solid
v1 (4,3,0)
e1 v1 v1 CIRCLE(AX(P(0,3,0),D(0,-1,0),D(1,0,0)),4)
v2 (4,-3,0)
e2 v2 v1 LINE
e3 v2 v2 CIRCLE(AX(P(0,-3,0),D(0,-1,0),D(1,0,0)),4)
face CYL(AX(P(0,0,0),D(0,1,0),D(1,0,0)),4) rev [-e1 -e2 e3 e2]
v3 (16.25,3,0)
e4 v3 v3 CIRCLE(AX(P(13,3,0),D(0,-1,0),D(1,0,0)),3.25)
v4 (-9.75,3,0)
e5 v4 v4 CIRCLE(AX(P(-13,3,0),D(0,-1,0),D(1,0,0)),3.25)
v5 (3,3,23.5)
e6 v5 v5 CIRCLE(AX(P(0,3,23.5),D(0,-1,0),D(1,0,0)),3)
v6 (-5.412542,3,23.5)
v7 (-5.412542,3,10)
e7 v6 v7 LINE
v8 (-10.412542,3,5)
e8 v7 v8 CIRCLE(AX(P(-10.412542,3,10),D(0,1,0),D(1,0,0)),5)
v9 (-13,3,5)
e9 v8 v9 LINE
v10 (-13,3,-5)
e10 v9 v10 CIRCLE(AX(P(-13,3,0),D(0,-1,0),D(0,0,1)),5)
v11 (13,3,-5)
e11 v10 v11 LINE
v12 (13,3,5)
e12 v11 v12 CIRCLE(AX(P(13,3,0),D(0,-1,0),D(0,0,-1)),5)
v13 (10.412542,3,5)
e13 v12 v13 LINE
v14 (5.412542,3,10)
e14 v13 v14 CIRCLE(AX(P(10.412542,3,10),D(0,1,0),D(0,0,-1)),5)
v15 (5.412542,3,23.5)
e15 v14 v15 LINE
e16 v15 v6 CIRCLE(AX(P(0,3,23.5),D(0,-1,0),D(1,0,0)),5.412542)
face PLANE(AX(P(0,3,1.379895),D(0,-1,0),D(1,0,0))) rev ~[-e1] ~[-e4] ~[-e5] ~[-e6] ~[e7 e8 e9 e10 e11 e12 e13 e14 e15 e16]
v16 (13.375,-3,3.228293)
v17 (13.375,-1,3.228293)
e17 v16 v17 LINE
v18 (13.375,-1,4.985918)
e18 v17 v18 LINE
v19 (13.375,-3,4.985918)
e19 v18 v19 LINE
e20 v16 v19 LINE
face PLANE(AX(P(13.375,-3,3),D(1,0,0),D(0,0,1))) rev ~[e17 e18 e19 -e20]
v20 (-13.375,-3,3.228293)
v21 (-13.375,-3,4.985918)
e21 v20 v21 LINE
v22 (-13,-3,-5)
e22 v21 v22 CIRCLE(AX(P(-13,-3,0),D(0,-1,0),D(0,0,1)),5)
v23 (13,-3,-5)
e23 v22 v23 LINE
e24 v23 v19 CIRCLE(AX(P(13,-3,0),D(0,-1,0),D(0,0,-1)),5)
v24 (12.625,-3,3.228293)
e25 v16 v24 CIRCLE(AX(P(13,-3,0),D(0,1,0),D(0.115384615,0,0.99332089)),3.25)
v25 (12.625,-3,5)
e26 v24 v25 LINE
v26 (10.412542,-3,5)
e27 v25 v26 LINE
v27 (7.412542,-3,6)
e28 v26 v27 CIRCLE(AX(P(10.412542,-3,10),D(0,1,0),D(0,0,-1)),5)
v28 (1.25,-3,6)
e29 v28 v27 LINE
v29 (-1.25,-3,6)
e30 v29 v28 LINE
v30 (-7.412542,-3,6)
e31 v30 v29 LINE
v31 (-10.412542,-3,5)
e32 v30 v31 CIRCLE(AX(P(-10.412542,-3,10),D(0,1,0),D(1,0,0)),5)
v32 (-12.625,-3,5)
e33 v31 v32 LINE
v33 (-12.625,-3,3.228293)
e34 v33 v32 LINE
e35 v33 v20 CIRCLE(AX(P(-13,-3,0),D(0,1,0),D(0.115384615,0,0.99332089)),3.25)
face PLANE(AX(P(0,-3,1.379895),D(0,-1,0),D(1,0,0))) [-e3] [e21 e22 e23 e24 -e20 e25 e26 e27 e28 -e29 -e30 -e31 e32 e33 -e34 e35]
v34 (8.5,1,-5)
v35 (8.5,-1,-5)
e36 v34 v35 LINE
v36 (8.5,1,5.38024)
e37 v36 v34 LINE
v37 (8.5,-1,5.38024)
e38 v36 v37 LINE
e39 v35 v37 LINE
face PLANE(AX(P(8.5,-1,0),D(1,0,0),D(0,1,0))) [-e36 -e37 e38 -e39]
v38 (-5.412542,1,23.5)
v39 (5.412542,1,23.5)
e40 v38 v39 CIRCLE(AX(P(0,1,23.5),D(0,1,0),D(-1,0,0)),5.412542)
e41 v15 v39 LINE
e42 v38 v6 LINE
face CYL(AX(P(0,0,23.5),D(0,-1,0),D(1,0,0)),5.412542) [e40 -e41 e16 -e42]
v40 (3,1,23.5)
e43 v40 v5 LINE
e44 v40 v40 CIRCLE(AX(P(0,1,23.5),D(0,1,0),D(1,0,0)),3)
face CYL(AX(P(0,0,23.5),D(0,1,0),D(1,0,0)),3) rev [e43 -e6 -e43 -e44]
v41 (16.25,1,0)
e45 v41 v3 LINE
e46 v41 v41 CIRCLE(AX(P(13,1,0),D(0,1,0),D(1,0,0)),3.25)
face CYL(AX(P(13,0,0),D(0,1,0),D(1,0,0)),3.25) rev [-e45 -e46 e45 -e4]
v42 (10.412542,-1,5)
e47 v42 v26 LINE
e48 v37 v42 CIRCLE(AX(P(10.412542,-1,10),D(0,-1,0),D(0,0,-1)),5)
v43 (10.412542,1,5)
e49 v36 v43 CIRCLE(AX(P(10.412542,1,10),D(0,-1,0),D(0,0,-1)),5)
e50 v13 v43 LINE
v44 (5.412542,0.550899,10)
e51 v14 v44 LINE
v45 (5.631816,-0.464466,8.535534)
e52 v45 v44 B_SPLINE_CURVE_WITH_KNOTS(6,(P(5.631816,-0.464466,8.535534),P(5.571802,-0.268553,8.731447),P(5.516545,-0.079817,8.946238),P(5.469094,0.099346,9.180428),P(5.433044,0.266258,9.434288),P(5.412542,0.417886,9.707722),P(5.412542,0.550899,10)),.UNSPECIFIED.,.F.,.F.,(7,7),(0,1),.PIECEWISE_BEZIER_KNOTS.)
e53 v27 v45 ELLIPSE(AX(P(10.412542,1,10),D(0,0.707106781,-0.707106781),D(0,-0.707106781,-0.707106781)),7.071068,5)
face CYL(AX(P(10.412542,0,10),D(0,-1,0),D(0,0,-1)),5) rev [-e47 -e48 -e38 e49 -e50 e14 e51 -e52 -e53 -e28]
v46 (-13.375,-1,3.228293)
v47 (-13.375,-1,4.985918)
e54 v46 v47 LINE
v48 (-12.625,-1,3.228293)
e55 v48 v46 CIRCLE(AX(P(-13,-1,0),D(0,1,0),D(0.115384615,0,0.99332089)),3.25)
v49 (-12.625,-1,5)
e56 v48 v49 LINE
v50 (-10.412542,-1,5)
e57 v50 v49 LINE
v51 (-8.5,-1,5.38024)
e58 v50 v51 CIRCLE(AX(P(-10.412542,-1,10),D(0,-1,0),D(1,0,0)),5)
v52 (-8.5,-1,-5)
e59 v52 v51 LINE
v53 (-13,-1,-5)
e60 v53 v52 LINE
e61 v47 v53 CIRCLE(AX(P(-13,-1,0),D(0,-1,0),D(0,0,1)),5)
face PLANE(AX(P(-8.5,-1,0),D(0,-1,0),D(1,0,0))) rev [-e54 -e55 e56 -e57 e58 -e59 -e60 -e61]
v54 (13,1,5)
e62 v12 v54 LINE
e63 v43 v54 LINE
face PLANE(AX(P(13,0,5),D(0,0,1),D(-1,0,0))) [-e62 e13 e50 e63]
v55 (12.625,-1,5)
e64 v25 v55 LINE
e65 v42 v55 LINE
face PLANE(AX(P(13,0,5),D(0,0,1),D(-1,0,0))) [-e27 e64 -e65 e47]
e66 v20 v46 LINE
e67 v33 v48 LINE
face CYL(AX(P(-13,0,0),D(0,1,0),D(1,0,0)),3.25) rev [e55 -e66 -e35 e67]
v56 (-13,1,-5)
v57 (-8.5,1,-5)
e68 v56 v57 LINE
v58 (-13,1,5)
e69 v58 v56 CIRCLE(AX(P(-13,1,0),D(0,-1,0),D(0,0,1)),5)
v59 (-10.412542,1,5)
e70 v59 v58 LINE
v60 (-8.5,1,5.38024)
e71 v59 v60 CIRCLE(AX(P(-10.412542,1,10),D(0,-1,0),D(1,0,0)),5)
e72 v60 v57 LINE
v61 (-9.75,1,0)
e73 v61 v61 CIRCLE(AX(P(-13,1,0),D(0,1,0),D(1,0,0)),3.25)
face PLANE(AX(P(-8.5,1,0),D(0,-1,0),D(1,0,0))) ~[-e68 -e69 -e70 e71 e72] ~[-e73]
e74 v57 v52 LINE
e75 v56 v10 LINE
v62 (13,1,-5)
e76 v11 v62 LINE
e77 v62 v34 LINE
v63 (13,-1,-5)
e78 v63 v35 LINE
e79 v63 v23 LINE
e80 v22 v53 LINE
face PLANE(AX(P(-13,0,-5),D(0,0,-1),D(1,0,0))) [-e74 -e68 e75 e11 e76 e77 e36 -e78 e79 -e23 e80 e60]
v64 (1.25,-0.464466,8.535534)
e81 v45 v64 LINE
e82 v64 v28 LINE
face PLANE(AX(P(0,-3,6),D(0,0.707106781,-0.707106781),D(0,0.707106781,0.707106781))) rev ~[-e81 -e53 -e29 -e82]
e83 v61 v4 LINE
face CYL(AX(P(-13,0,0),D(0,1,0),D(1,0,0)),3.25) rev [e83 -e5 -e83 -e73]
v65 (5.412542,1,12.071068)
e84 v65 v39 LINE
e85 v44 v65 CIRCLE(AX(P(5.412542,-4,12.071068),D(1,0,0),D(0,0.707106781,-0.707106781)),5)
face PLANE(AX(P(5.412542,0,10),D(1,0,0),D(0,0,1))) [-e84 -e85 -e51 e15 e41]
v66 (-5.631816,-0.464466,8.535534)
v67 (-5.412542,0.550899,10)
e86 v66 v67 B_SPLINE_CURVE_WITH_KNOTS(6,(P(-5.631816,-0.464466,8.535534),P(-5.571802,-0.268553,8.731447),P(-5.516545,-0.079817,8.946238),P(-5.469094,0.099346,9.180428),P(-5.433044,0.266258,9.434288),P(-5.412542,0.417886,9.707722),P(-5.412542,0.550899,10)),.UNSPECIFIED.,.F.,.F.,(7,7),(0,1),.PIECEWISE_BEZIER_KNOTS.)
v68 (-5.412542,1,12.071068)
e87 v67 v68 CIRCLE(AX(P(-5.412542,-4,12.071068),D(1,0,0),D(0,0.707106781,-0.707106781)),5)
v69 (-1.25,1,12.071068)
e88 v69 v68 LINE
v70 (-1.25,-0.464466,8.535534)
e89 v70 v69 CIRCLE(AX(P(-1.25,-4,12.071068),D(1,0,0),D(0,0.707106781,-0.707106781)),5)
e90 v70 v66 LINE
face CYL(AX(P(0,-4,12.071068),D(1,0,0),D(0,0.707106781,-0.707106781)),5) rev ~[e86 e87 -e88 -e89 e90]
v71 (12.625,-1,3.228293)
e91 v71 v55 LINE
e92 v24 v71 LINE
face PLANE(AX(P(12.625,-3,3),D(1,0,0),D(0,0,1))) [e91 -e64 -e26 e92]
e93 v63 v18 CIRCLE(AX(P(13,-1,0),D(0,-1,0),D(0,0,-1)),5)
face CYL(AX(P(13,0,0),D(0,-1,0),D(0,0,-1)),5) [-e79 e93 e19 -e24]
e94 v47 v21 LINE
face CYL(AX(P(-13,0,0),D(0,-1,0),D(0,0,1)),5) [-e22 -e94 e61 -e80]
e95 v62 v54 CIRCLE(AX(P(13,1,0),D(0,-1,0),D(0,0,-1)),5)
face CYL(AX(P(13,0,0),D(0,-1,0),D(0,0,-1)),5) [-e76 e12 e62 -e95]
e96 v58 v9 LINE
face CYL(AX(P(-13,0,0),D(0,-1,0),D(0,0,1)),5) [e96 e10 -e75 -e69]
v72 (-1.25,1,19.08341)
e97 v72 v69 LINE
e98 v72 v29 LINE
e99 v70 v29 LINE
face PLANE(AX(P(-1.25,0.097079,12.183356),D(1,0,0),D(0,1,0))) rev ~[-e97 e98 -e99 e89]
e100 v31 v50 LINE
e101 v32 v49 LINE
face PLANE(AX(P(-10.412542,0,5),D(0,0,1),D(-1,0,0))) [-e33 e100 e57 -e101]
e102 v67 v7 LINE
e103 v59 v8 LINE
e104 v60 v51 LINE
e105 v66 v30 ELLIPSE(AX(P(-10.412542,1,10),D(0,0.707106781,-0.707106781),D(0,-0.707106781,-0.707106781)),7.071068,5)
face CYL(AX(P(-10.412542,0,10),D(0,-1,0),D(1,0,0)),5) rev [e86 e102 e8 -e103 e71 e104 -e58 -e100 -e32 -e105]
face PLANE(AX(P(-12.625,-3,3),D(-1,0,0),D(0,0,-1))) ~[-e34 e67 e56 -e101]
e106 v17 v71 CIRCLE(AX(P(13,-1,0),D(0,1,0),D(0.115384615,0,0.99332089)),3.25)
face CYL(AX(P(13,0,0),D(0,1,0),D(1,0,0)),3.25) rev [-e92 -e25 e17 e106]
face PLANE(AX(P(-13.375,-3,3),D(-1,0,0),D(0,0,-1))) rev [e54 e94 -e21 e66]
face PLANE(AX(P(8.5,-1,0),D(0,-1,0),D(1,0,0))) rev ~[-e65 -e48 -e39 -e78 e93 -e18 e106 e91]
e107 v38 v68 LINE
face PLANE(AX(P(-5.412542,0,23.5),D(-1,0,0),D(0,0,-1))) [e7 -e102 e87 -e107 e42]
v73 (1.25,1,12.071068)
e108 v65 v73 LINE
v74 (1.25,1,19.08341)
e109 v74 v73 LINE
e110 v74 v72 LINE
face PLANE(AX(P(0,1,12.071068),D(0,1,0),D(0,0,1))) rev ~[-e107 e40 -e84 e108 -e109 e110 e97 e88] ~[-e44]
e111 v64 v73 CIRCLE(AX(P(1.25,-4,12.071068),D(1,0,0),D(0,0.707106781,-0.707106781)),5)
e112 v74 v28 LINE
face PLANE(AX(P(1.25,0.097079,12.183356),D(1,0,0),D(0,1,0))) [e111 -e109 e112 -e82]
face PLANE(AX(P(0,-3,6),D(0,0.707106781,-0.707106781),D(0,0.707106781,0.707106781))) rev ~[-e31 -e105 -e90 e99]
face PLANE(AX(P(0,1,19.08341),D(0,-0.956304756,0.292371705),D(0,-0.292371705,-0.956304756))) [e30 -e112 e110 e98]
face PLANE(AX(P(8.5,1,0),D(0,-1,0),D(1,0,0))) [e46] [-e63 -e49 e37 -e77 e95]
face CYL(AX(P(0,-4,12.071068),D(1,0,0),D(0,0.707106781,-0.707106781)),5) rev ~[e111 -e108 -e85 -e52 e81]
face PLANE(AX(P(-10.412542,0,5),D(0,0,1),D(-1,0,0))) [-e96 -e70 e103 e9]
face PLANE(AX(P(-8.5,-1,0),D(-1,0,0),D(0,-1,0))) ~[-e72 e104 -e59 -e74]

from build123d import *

# Parameters (mm, degrees)
F0_R     = 3.25
F0_R_2   = 4
F0_R_3   = 3
F1_DEPTH = 3
F3_DEPTH = 12.5
F5_DEPTH = 1.25
F6_W     = 9.5
F6_H     = 2
F7_DEPTH = 12.5
F8_W     = 0.75
F8_H     = 4
F9_DEPTH = 2


# Not quite as in the source:
# - a pattern or mirror of a feature is missing from the dataset's text; its kind, count and spacing are read off the source's solid


with BuildPart() as f1:
    # F0 (on Front) → F1 (new body, symmetric)
    with BuildSketch(Plane.XZ):
        with BuildLine():
            Line((-13, -5), (13, -5))
            ThreePointArc((13, -5), (18, 0), (13, 5))
            Line((13, 5), (10.4125417955, 5))
            ThreePointArc((10.4125417955, 5), (6.8770078896, 6.4644660941), (5.4125417955, 10))
            Line((5.4125417955, 10), (5.4125417955, 6))
            Line((5.4125417955, 6), (-5.4125417955, 6))
            Line((-5.4125417955, 6), (-5.4125417955, 10))
            ThreePointArc((-5.4125417955, 10), (-6.8770078896, 6.4644660941), (-10.4125417955, 5))
            Line((-10.4125417955, 5), (-13, 5))
            ThreePointArc((-13, 5), (-18, 0), (-13, -5))
        make_face()
        with Locations((-13, 0)):
            Circle(F0_R, mode=Mode.SUBTRACT)
        Circle(F0_R_2, mode=Mode.SUBTRACT)
        with Locations((13, 0)):
            Circle(F0_R, mode=Mode.SUBTRACT)
        with BuildLine():
            Line((5.4125417955, 6), (5.4125417955, 10))
            Line((5.4125417955, 10), (5.4125417955, 23.5))
            ThreePointArc((5.4125417955, 23.5), (0, 28.9125417955), (-5.4125417955, 23.5))
            Line((-5.4125417955, 23.5), (-5.4125417955, 10))
            Line((-5.4125417955, 10), (-5.4125417955, 6))
            Line((-5.4125417955, 6), (5.4125417955, 6))
        make_face()
        with Locations((0, 23.5)):
            Circle(F0_R_3, mode=Mode.SUBTRACT)
    extrude(amount=F1_DEPTH, both=True)

    # F2 (on Right) → F3 (cut, symmetric)
    with BuildSketch(Plane.YZ):
        with BuildLine():
            Line((1, 28.9125417955), (-3, 28.9125417955))
            Line((-3, 28.9125417955), (-3, 23.5))
            Line((-3, 23.5), (-3, 10))
            Line((-3, 10), (-3, 6))
            Line((-3, 6), (-0.4644660941, 8.5355339059))
            ThreePointArc((-0.4644660941, 8.5355339059), (0.6193976626, 10.15765065), (1, 12.0710678119))
            Line((1, 12.0710678119), (1, 28.9125417955))
        make_face()
    extrude(amount=F3_DEPTH, both=True, mode=Mode.SUBTRACT)

    # F4 (on Right) → F5 (join, symmetric)
    with BuildSketch(Plane.YZ):
        Polygon((1, 19.0834104739), (-3, 6), (1.3459398516, 6), (1.3459398516, 20.2149287434), align=None)
    extrude(amount=F5_DEPTH, both=True)

    # F6 (on Top) → F7 (cut, symmetric)
    with BuildSketch(Plane.XY):
        with Locations((13.25, 0)):
            Rectangle(F6_W, F6_H)
    f7 = extrude(amount=F7_DEPTH, both=True, mode=Mode.SUBTRACT)

    # F7_copies: F7 across plane
    add(f7.mirror(Plane(origin=(0, 0, 0), x_dir=(0, 0, -1), z_dir=(-1, 0, 0))), mode=Mode.SUBTRACT)

    # F8 (on face) → F9 (cut)
    with BuildSketch(Plane.XZ.offset(3)):
        with Locations((13, 5)):
            Rectangle(F8_W, F8_H)
    f9 = extrude(amount=-F9_DEPTH, mode=Mode.SUBTRACT)

    # F9_copies: F9 across plane
    add(f9.mirror(Plane(origin=(0, 0, 0), x_dir=(0, 0, -1), z_dir=(-1, 0, 0))), mode=Mode.SUBTRACT)


solid = f1.part
